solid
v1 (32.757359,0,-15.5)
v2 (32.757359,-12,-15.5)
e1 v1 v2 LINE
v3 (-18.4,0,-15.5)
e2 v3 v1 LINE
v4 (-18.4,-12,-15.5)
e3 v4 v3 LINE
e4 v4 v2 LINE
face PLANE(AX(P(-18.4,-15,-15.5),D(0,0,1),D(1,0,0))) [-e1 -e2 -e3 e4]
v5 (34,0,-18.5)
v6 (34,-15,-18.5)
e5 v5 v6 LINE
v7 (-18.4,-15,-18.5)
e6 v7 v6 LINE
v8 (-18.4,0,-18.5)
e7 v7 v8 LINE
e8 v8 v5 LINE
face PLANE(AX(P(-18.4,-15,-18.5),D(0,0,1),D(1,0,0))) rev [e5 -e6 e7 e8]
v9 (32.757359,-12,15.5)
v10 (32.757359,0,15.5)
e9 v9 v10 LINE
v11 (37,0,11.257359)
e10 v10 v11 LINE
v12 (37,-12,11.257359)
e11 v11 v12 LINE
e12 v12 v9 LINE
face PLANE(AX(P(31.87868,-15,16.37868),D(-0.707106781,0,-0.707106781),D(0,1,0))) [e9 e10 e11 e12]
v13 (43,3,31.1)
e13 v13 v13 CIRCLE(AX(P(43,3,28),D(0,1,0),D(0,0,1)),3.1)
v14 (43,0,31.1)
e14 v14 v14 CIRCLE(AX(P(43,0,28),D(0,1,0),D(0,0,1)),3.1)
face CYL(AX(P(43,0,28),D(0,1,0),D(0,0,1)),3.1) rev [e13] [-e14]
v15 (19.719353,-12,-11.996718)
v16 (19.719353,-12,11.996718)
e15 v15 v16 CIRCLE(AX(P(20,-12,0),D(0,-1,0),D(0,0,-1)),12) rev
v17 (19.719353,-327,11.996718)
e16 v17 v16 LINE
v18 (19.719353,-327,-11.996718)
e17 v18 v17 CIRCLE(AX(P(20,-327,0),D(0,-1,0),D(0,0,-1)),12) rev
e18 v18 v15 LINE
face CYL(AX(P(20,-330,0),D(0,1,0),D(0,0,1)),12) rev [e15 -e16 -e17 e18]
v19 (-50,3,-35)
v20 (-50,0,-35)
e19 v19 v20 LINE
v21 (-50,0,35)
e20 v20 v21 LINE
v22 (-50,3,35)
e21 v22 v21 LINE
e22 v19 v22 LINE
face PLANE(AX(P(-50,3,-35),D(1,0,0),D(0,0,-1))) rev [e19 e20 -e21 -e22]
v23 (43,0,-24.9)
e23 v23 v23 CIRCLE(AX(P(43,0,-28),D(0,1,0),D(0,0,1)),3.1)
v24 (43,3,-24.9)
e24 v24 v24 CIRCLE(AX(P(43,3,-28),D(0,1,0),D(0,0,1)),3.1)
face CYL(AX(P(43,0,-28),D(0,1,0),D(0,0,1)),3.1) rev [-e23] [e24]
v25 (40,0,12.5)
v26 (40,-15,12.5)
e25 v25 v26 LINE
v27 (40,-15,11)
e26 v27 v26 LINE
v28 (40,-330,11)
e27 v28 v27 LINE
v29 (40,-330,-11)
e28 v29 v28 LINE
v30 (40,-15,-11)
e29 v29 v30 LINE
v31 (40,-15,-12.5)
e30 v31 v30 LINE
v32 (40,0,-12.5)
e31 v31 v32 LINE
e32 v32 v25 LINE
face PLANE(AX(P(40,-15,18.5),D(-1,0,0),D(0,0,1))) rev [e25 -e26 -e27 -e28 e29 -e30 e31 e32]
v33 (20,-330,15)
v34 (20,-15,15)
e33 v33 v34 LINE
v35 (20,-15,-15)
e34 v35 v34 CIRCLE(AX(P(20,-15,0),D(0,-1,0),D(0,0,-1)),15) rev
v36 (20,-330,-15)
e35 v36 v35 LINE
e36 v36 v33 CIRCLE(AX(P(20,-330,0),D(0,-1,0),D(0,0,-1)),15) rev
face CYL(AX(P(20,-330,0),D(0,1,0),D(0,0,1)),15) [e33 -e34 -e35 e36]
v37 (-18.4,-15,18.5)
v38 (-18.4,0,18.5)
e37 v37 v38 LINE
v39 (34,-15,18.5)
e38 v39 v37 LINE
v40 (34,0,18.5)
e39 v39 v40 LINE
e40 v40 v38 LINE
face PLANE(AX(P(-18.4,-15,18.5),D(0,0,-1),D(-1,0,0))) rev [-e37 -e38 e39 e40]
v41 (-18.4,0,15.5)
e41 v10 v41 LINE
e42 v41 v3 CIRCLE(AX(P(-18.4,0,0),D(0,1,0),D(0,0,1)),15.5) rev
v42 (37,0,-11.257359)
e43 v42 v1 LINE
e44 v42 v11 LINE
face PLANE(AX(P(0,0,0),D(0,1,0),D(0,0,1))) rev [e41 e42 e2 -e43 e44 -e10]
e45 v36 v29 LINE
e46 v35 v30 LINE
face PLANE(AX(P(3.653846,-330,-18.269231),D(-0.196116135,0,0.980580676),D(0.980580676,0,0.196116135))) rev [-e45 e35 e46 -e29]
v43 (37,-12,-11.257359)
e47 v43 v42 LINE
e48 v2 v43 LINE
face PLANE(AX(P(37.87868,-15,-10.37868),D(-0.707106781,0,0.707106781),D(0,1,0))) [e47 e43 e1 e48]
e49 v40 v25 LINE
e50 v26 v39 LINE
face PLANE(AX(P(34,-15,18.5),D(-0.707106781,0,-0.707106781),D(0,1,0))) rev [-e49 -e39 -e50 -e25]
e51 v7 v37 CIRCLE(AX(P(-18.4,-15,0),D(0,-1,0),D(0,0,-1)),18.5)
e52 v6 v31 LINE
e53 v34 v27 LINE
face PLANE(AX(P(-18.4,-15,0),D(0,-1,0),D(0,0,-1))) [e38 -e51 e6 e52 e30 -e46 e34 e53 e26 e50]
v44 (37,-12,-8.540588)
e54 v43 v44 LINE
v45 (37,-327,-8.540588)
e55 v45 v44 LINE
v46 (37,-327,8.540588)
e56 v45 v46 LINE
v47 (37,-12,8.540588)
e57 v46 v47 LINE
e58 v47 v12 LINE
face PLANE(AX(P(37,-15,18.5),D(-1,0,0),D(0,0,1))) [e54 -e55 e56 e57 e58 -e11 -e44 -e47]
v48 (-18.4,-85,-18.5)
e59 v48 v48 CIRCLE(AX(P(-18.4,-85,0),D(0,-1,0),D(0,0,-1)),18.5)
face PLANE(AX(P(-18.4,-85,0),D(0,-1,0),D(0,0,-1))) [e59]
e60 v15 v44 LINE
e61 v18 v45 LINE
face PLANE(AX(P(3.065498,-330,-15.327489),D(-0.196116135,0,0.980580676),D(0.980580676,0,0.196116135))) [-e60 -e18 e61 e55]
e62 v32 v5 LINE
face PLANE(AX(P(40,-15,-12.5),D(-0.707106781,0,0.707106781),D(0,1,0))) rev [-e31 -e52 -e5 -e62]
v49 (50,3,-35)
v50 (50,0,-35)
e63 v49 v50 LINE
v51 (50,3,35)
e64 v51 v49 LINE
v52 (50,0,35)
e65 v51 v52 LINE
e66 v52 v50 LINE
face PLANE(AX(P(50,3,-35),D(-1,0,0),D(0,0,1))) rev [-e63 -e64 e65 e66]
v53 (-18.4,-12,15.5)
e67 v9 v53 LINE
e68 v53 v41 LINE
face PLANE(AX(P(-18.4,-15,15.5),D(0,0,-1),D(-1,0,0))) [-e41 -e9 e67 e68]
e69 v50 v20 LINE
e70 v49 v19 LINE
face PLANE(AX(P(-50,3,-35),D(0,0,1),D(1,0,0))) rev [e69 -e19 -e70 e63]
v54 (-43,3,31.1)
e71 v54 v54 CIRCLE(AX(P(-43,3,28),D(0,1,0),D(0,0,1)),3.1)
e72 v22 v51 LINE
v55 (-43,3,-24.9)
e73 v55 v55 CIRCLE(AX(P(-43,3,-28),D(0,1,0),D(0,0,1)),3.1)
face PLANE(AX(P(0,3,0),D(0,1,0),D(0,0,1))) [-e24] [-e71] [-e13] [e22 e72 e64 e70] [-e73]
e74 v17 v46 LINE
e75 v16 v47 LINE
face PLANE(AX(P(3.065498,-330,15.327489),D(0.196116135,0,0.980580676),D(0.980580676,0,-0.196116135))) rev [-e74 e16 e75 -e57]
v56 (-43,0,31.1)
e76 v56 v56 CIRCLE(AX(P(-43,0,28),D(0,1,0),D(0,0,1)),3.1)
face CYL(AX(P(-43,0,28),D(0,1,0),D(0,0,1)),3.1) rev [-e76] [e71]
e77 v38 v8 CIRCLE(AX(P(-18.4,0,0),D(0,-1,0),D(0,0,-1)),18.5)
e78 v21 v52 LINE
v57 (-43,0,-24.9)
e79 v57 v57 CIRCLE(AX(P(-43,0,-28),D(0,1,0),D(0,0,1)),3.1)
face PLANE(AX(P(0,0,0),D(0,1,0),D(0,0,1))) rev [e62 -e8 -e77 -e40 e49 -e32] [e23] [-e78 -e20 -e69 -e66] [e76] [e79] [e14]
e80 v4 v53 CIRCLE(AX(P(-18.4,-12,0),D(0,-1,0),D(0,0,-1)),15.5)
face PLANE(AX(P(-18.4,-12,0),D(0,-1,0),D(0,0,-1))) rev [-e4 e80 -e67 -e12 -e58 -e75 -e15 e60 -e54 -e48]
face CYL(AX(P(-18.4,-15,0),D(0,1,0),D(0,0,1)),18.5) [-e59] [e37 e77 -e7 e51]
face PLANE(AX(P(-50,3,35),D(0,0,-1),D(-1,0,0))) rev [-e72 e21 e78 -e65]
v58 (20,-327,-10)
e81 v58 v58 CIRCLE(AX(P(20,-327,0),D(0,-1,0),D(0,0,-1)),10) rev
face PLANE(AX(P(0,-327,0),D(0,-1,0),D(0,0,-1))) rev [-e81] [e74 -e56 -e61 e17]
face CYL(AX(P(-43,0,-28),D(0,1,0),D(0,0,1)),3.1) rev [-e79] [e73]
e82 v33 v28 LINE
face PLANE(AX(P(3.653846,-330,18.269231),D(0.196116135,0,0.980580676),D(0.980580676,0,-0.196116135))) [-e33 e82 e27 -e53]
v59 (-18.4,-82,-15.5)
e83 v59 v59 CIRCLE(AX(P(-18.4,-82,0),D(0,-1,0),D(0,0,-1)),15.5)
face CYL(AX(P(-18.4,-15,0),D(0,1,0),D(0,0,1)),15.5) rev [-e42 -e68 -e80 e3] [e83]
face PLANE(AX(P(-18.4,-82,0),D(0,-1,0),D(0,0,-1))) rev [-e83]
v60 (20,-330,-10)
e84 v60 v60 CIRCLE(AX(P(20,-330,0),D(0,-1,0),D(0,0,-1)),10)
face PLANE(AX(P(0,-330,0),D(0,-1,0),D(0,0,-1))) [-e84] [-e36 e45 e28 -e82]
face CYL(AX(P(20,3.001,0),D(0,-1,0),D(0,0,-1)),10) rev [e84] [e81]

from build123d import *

# Parameters (mm, degrees)
SKETCH_1_W                  = 100
SKETCH_1_H                  = 70
EXTRUDE_1_DEPTH             = 3
SKETCH_2_R                  = 3.1
CUT_EXTRUDE_1_DEPTH         = 62.10646447
PATTERN_LINEAR_2_COUNT      = 2
PATTERN_LINEAR_2_PITCH      = 56
PATTERN_LINEAR_2_COUNT_DIR2 = 2
PATTERN_LINEAR_2_PITCH_DIR2 = 86
EXTRUDE_2_DEPTH             = 15
CHAMFER_2_SIZE              = 6
SKETCH_4_R                  = 18.5
EXTRUDE_3_DEPTH             = 70
EXTRUDE_4_DEPTH             = 315
SHELL_START                 = -327
SHELL_5_DEPTH               = 327
SHELL_START_2               = -82
SHELL_5_2_OUTLINE_R         = 15.5
SHELL_5_2_DEPTH             = 82
SHELL_START_3               = -12
SHELL_5_3_DEPTH             = 12
CUT_EXTRUDE_2_REACH         = 340.547
SKETCH_6_R                  = 10


# Read off the part's stored shape, not the designer's step: 抽壳5
with BuildPart() as part:
    # 草图1 → 凸台-拉伸1 (new body)
    with BuildSketch(Plane(origin=(0, 0, 0), x_dir=(1, 0, 0), z_dir=(0, 1, 0))):
        Rectangle(SKETCH_1_W, SKETCH_1_H)
    extrude(amount=EXTRUDE_1_DEPTH)

    # 草图2 → 切除-拉伸1 (cut, through all)
    with BuildSketch(Plane(origin=(0, 3, 0), x_dir=(1, 0, 0), z_dir=(0, 1, 0))):
        with Locations(Location((-43, 28, 0), (0, 0, 270))):
            Circle(SKETCH_2_R)
    cut_extrude_1 = extrude(amount=-CUT_EXTRUDE_1_DEPTH, mode=Mode.SUBTRACT)

    # 阵列(线性)2: Cut-Extrude 1 2 × 2
    with Locations(*[(j * PATTERN_LINEAR_2_PITCH_DIR2, 0, i * PATTERN_LINEAR_2_PITCH) for i in range(PATTERN_LINEAR_2_COUNT) for j in range(PATTERN_LINEAR_2_COUNT_DIR2) if (i, j) != (0, 0)]):
        add(cut_extrude_1, mode=Mode.SUBTRACT)

    # 草图3 → 凸台-拉伸2 (add)
    with BuildSketch(Plane.XZ):
        with BuildLine():
            Line((-18.4, 18.5), (40, 18.5))
            Line((40, 18.5), (40, -18.5))
            Line((40, -18.5), (-18.4, -18.5))
            ThreePointArc((-18.4, -18.5), (-36.9, 0), (-18.4, 18.5))
        make_face()
    extrude(amount=EXTRUDE_2_DEPTH)

    # 倒角2
    chamfer_2_edges = [part.edges().sort_by_distance(p)[0] for p in [
        (40, -7.5, -18.5),
        (40, -7.5, 18.5),
    ]]
    chamfer(chamfer_2_edges, length=CHAMFER_2_SIZE)

    # 草图4 → 凸台-拉伸3 (add)
    with BuildSketch(Plane(origin=(0, -15, 0), x_dir=(-1, 0, 0), z_dir=(0, -1, 0))):
        with Locations(Location((18.4, 0, 0), (0, 0, 90))):
            Circle(SKETCH_4_R)
    extrude(amount=EXTRUDE_3_DEPTH)

    # 草图5 → 凸台-拉伸4 (add)
    with BuildSketch(Plane.XZ.offset(15)):
        with BuildLine():
            ThreePointArc((20, -15), (5, 0), (20, 15))
            Line((20, 15), (20, -15))
        make_face()
        Polygon((20, -15), (40, -11), (40, 11), (20, 15), align=None)
    extrude(amount=EXTRUDE_4_DEPTH)

    # 抽壳5 outline → 抽壳5 (cut)
    with BuildSketch(Plane(origin=(0, 0, 0), x_dir=(1, 0, 0), z_dir=(0, 1, 0)).offset(SHELL_START)):
        with BuildLine():
            Line((37, -8.540588292), (37, 8.540588292))
            Line((37, 8.540588292), (19.719352649, 11.996717762))
            ThreePointArc((19.719352649, 11.996717762), (8, 0), (19.719352649, -11.996717762))
            Line((19.719352649, -11.996717762), (37, -8.540588292))
        make_face()
    extrude(amount=SHELL_5_DEPTH, mode=Mode.SUBTRACT)

    # Shell 5 2 outline → Shell 5 2 (cut)
    with BuildSketch(Plane(origin=(0, 0, 0), x_dir=(1, 0, 0), z_dir=(0, 1, 0)).offset(SHELL_START_2)):
        with Locations((-18.4, 0)):
            Circle(SHELL_5_2_OUTLINE_R)
    extrude(amount=SHELL_5_2_DEPTH, mode=Mode.SUBTRACT)

    # Shell 5 3 outline → Shell 5 3 (cut)
    with BuildSketch(Plane(origin=(0, 0, 0), x_dir=(1, 0, 0), z_dir=(0, 1, 0)).offset(SHELL_START_3)):
        with BuildLine():
            Line((32.757359313, 15.5), (-18.4, 15.5))
            ThreePointArc((-18.4, 15.5), (-2.9, 0), (-18.4, -15.5))
            Line((-18.4, -15.5), (32.757359313, -15.5))
            Line((32.757359313, -15.5), (37, -11.257359313))
            Line((37, -11.257359313), (37, -8.540588292))
            Line((37, -8.540588292), (19.719352649, -11.996717762))
            ThreePointArc((19.719352649, -11.996717762), (8, 0), (19.719352649, 11.996717762))
            Line((19.719352649, 11.996717762), (37, 8.540588292))
            Line((37, 8.540588292), (37, 11.257359313))
            Line((37, 11.257359313), (32.757359313, 15.5))
        make_face()
    extrude(amount=SHELL_5_3_DEPTH, mode=Mode.SUBTRACT)

    # 草图6 → 切除-拉伸2 (cut, up to next)
    with BuildSketch(Plane.XZ.offset(330), mode=Mode.PRIVATE) as cut_extrude_2_sk1:
        with Locations(Location((20, 0, 0), (0, 0, 270))):
            Circle(SKETCH_6_R)
    cut_extrude_2_tool1 = extrude(cut_extrude_2_sk1.sketch, amount=-CUT_EXTRUDE_2_REACH, mode=Mode.PRIVATE) & part.part
    add(cut_extrude_2_tool1.solids().sort_by_distance((20, -330, 0))[0], mode=Mode.SUBTRACT)


solid = part.part
